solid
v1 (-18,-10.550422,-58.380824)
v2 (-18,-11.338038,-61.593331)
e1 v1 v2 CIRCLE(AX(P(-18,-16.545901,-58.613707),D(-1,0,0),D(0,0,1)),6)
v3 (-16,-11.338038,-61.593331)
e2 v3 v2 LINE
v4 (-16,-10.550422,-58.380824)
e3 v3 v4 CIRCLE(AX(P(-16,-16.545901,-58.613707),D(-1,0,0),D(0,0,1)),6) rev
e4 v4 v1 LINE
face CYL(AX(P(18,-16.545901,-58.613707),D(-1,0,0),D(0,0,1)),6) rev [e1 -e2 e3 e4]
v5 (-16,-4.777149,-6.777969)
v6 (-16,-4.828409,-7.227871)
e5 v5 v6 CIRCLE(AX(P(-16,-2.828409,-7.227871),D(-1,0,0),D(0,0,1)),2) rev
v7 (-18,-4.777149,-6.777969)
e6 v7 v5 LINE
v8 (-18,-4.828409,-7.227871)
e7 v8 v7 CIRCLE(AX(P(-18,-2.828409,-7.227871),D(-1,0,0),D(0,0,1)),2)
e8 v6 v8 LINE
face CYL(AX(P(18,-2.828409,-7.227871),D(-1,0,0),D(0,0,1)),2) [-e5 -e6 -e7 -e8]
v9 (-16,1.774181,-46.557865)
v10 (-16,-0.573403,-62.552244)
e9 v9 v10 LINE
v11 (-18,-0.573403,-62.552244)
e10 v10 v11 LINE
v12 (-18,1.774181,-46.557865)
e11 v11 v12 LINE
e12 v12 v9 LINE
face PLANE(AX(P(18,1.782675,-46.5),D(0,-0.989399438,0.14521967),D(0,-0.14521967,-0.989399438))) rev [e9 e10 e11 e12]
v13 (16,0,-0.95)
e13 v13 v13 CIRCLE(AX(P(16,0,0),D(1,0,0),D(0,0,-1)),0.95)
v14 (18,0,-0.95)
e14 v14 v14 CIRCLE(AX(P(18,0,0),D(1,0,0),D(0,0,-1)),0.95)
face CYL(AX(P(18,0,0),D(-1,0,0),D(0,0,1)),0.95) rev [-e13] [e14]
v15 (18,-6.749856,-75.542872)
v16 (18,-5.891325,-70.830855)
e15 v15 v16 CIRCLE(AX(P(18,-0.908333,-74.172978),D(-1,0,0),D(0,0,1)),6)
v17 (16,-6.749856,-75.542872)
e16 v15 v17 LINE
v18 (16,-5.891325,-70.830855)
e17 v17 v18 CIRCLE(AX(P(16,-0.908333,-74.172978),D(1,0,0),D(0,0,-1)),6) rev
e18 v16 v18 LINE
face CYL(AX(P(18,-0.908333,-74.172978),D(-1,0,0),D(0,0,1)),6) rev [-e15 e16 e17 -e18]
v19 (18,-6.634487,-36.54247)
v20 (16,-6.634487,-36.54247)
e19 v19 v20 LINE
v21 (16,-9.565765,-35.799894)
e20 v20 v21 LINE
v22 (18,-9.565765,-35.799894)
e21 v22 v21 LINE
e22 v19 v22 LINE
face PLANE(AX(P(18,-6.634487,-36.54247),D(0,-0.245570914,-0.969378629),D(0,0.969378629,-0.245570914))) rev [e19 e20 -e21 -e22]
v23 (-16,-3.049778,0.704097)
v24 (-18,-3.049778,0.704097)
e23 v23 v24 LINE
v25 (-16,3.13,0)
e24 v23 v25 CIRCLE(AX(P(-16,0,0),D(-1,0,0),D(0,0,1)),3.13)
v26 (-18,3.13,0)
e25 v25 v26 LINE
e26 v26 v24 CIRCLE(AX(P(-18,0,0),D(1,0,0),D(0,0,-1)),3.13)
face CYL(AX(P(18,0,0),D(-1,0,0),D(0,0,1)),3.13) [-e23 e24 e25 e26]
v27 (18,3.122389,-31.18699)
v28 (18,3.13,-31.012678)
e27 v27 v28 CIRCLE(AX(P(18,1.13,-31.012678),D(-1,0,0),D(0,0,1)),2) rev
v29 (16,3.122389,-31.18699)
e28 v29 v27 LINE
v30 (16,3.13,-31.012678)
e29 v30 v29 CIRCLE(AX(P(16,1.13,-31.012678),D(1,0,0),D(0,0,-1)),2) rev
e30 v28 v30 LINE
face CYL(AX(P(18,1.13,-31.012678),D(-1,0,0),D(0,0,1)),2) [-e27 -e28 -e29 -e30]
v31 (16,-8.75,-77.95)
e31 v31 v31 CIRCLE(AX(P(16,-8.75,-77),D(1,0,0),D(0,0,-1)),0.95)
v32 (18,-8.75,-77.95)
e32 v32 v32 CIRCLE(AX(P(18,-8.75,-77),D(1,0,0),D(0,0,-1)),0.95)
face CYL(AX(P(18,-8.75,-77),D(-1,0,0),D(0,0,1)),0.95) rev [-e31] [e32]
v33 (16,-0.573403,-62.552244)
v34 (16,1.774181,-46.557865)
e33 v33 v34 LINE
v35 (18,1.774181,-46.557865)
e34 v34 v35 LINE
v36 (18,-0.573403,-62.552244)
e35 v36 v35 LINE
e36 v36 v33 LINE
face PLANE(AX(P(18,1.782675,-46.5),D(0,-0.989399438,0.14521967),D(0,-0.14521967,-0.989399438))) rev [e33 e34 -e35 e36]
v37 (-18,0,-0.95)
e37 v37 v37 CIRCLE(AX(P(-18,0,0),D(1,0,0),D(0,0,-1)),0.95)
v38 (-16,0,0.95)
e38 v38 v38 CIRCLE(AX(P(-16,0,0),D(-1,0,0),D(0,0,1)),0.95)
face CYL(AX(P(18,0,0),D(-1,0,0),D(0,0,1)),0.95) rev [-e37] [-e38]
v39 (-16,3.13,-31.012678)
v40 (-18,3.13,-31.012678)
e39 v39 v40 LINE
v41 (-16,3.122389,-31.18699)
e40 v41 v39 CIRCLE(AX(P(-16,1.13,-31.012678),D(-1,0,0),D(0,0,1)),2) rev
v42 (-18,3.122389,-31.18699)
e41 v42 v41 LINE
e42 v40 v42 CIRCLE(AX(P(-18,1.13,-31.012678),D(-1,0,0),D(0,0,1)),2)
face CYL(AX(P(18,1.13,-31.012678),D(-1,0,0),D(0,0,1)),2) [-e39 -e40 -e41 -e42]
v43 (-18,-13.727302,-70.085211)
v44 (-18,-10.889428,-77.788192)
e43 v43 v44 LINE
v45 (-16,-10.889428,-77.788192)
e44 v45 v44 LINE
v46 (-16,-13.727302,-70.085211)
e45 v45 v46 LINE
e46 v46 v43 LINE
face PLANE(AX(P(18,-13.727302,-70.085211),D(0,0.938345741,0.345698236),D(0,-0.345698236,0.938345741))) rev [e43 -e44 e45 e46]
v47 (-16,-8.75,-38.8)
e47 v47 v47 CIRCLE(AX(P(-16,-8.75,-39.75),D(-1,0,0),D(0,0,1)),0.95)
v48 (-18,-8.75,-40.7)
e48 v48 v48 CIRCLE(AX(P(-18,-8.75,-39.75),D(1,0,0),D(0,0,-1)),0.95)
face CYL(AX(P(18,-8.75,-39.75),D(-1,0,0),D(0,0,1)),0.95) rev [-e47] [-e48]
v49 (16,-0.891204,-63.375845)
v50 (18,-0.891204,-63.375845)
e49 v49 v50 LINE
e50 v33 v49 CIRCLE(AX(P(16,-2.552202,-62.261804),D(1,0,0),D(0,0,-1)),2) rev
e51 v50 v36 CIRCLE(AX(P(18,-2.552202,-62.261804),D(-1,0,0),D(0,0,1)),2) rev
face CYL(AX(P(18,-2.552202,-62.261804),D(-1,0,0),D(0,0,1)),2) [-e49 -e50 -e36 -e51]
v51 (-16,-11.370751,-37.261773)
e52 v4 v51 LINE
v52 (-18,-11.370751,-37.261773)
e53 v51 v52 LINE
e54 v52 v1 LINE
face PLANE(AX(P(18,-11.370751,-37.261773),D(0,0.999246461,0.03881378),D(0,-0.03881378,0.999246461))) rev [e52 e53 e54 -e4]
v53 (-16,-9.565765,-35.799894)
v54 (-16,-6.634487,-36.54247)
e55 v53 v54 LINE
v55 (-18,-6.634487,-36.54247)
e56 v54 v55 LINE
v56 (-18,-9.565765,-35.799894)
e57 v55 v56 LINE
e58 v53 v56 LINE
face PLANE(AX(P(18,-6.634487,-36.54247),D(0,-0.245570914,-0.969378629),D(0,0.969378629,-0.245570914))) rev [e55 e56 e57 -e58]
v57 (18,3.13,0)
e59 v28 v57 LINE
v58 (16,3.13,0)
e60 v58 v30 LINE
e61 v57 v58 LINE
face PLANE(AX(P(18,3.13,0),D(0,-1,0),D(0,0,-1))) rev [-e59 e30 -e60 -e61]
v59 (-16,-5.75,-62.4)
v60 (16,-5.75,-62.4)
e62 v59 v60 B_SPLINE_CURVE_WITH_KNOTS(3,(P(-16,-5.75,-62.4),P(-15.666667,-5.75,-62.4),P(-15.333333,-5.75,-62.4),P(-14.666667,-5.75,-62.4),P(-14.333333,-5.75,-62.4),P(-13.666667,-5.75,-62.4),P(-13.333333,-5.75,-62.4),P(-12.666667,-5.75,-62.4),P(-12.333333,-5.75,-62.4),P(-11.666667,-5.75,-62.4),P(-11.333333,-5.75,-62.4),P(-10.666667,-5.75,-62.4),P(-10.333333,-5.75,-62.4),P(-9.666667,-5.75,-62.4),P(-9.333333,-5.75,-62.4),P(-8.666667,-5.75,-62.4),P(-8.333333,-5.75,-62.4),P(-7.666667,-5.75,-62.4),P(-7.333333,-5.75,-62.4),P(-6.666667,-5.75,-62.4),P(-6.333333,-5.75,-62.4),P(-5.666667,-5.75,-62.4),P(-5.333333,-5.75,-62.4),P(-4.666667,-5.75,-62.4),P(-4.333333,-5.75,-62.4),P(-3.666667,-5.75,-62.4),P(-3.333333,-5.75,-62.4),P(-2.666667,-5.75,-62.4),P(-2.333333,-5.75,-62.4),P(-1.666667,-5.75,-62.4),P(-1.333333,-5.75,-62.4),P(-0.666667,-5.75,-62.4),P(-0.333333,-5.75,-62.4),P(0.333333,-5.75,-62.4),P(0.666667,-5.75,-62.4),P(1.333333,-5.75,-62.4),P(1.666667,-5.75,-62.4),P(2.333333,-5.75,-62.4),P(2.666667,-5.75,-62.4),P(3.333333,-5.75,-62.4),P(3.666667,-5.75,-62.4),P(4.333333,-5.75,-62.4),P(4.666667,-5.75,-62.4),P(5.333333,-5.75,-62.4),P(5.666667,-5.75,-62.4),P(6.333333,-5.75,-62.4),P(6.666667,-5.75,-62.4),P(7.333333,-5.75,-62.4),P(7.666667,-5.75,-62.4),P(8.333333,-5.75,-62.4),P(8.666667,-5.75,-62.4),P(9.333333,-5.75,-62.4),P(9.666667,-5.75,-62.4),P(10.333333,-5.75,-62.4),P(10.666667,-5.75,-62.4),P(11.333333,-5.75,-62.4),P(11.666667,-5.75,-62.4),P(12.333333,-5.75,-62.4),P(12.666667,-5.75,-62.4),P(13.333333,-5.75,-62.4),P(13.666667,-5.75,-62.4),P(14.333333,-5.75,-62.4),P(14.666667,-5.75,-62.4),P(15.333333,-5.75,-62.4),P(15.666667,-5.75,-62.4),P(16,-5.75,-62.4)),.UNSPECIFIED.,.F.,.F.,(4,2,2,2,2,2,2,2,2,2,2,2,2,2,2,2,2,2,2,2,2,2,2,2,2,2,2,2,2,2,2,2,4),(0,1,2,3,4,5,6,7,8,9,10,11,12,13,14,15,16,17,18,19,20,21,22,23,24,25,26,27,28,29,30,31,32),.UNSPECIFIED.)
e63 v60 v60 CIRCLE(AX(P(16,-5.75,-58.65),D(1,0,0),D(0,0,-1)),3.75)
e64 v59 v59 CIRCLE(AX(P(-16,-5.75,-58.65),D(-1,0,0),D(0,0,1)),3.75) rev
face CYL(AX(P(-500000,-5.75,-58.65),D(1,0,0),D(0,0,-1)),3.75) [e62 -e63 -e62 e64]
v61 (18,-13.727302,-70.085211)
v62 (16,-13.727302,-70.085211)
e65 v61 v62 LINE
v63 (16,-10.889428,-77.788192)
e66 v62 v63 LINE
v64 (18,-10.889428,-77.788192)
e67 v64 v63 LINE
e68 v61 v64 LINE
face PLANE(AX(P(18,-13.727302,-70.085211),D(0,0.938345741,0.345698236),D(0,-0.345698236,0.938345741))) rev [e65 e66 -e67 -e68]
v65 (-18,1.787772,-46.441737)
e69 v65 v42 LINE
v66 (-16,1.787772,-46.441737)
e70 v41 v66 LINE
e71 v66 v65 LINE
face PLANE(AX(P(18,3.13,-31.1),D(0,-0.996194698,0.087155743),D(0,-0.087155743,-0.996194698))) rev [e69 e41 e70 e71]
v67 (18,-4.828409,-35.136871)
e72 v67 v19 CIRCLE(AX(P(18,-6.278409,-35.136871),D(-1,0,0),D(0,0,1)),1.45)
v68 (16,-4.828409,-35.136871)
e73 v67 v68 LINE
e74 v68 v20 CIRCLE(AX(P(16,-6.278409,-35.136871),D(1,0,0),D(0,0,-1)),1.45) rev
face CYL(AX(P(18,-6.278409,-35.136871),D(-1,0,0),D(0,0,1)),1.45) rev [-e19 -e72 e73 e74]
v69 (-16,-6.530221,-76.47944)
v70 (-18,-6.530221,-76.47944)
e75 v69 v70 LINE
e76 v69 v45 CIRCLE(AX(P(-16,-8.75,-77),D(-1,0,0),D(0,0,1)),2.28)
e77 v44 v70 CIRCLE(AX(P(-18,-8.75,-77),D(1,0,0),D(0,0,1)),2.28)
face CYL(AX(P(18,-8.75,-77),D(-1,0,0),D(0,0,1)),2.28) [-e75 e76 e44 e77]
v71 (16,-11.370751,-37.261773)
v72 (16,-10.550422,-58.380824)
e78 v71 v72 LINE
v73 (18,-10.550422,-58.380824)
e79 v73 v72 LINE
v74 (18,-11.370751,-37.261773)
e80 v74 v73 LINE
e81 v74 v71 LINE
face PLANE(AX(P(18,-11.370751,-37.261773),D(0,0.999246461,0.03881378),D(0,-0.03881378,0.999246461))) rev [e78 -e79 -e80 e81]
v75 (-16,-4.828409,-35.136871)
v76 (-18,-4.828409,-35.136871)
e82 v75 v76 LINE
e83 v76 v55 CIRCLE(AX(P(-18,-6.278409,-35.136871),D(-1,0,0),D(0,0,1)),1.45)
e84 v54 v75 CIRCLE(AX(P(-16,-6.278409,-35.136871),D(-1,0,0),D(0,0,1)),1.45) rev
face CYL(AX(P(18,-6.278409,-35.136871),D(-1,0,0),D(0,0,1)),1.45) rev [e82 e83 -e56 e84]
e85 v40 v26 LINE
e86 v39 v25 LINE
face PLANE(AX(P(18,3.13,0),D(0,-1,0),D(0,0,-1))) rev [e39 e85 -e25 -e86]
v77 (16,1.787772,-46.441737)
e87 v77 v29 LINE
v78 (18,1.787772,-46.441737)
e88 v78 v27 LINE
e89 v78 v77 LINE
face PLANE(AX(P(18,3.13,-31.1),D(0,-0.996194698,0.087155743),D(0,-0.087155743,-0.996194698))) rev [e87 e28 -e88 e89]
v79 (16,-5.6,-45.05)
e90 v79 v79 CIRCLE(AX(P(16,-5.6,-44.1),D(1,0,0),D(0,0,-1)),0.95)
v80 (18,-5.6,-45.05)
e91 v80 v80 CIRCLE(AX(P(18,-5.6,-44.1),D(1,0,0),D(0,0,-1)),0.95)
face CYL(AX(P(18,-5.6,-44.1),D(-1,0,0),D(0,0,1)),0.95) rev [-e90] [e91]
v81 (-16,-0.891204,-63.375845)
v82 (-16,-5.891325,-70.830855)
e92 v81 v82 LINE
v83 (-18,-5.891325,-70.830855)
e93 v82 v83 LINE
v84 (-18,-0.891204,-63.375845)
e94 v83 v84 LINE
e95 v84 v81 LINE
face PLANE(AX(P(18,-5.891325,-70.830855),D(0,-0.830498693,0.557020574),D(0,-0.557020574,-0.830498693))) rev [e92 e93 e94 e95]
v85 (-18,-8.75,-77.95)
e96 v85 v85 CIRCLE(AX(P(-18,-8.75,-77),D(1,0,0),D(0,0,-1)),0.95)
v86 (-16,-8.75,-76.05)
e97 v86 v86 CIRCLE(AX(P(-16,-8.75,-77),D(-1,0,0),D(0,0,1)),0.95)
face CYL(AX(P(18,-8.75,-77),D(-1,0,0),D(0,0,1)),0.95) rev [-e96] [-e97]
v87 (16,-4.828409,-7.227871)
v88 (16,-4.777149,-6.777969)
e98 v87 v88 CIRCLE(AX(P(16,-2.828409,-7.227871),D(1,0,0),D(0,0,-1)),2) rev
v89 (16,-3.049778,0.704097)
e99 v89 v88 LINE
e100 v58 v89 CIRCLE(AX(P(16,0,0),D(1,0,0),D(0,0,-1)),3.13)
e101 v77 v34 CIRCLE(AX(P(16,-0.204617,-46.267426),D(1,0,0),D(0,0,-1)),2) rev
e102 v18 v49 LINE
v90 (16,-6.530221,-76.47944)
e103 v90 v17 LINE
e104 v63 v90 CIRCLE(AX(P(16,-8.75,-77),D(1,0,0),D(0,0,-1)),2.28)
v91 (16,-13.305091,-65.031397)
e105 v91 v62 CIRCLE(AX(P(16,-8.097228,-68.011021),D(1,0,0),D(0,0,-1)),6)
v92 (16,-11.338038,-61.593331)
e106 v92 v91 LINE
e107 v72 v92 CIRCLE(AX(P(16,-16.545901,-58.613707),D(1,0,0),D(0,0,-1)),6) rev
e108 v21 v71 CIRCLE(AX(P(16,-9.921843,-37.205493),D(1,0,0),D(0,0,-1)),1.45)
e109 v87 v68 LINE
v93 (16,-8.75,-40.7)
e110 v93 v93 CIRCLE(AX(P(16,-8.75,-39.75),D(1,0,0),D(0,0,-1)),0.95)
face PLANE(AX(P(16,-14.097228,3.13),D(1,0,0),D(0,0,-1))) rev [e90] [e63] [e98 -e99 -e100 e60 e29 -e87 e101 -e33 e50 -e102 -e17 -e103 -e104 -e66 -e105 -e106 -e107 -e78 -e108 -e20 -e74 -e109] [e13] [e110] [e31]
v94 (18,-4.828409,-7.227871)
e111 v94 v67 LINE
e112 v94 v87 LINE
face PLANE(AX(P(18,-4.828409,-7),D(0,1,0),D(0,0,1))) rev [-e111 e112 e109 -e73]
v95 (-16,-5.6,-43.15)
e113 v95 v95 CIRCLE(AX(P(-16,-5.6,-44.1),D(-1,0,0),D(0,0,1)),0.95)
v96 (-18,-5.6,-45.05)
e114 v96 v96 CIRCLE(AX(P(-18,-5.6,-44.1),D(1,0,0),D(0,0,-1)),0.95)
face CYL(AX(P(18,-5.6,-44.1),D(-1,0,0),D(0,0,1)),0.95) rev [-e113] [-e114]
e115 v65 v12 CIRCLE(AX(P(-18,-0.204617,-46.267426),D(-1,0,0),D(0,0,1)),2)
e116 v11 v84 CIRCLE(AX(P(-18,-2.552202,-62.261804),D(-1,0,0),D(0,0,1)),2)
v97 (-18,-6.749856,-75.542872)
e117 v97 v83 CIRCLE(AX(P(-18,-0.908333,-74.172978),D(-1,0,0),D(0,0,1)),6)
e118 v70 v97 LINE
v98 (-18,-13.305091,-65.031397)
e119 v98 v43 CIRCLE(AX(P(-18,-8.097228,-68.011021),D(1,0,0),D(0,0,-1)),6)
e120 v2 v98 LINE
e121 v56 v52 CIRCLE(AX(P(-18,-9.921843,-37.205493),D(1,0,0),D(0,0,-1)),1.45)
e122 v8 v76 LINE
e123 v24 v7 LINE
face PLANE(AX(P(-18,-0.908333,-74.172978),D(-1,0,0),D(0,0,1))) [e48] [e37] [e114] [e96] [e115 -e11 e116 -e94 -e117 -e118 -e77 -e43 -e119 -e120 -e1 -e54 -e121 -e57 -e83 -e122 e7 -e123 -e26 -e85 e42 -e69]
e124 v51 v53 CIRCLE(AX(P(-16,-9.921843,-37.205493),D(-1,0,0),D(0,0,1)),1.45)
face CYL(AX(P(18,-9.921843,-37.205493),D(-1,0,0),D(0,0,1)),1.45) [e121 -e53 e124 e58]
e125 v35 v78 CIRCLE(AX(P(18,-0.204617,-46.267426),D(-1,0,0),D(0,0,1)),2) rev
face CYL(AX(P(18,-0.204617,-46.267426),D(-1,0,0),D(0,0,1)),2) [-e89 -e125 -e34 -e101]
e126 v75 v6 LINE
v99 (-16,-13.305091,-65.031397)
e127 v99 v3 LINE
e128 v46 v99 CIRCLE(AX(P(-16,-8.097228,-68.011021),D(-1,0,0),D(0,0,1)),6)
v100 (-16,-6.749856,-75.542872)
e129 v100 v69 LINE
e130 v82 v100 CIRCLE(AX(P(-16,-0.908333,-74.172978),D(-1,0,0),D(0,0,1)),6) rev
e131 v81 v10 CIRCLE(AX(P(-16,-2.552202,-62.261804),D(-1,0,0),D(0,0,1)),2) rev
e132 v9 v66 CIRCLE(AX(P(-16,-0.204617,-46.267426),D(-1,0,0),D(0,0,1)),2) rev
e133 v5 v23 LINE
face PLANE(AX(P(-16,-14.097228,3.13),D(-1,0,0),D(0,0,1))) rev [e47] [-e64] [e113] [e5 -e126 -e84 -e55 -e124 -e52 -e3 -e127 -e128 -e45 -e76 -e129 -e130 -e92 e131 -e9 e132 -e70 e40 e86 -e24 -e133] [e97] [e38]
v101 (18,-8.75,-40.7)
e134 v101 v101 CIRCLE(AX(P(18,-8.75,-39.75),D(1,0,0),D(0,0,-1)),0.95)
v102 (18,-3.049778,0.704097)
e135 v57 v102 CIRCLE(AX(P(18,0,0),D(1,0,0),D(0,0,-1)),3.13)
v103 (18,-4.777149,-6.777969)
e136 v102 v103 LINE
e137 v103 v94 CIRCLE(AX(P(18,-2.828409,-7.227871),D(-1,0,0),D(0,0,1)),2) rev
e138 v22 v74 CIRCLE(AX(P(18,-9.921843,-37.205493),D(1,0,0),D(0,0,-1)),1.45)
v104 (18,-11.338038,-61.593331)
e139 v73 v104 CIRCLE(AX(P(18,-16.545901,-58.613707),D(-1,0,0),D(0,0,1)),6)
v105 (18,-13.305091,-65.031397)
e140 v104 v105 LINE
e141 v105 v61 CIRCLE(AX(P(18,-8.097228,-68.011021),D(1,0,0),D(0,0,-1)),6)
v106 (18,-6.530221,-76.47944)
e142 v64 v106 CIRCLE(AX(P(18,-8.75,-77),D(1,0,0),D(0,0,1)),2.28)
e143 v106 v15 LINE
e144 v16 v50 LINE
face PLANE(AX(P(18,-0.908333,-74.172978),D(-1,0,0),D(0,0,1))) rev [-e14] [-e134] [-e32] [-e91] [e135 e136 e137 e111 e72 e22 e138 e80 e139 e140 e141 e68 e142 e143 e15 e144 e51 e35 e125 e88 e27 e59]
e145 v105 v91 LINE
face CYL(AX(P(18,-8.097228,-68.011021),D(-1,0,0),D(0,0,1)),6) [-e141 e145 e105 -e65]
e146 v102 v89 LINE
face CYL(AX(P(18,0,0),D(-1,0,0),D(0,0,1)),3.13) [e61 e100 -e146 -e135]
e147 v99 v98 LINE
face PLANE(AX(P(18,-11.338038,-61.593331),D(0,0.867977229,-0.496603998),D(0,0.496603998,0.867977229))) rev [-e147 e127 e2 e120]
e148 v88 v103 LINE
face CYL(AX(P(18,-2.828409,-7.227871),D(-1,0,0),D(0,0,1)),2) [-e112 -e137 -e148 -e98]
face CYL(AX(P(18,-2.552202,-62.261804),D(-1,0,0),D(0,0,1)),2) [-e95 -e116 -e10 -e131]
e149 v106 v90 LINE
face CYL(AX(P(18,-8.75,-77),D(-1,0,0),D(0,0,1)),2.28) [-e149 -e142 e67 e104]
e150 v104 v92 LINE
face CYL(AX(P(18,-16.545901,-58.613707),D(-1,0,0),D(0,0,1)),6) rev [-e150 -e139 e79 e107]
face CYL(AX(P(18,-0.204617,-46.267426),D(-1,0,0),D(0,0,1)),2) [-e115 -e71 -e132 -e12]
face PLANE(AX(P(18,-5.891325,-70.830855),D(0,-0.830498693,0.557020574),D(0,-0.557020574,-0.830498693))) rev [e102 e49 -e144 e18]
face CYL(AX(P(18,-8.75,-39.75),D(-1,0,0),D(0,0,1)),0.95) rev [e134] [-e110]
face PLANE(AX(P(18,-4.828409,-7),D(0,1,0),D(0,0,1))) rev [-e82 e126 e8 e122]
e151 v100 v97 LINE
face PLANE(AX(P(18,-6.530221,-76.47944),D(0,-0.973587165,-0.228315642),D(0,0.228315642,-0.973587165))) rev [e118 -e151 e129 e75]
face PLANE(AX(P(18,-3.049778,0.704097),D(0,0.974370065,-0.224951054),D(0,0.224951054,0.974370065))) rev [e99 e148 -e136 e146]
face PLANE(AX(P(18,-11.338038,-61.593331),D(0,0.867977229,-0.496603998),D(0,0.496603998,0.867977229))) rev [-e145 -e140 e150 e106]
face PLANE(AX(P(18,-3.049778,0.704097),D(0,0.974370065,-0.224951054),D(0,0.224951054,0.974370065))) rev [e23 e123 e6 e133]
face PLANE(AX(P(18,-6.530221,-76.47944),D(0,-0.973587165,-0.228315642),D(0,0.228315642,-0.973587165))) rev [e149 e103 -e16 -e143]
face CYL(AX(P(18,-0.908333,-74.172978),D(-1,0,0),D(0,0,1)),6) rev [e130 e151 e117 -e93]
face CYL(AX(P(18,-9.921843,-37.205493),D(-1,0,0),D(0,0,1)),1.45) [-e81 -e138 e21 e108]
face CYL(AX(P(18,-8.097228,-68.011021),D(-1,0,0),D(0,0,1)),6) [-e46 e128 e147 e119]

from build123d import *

# Parameters (mm, degrees)
SKETCH1_R                = 0.95
BOSS_EXTRUDE1_DEPTH      = 18
FILLET1_R                = 2
CUT_EXTRUDE1_DEPTH       = 83.510909783
CUT_EXTRUDE1_DEPTH_BACK  = 83.510909783
SKETCH2_W                = 32
SKETCH2_H                = 82.41
BOSS_EXTRUDE2_DEPTH      = 18
BOSS_EXTRUDE2_DEPTH_BACK = 16
SKETCH3_R                = 3.75


with BuildPart() as part:
    # Sketch1 → Boss-Extrude1 (new, symmetric)
    with BuildSketch(Plane(origin=(0, 0, 0), x_dir=(0, 0, -1), z_dir=(1, 0, 0))):
        with BuildLine():
            Line((0, 3.13), (31.1, 3.13))
            Line((31.1, 3.13), (46.5, 1.782674582))
            Line((46.5, 1.782674582), (63, -0.639122384))
            Line((63, -0.639122384), (70.830854785, -5.891324783))
            ThreePointArc((70.830854785, -5.891324783), (73.097482442, -6.811154728), (75.542872081, -6.749855612))
            Line((75.542872081, -6.749855612), (76.479440337, -6.530221264))
            ThreePointArc((76.479440337, -6.530221264), (79.183707452, -8.094392066), (77.788191978, -10.889428289))
            Line((77.788191978, -10.889428289), (70.085210842, -13.7273023))
            ThreePointArc((70.085210842, -13.7273023), (67.51150317, -14.076398492), (65.031397439, -13.305091226))
            Line((65.031397439, -13.305091226), (61.593330792, -11.338037731))
            ThreePointArc((61.593330792, -11.338037731), (60.042423522, -10.718485849), (58.380824128, -10.550422334))
            Line((58.380824128, -10.550422334), (37.261773194, -11.370750671))
            ThreePointArc((37.261773194, -11.370750671), (36.078702039, -10.834444885), (35.799894202, -9.565765476))
            Line((35.799894202, -9.565765476), (36.542469609, -6.634487021))
            ThreePointArc((36.542469609, -6.634487021), (36.281163577, -5.387851181), (35.136870597, -4.828409195))
            Line((35.136870597, -4.828409195), (7, -4.828409195))
            Line((7, -4.828409195), (-0.7040968, -3.049778303))
            ThreePointArc((-0.7040968, -3.049778303), (-3.109879908, 0.354326059), (0, 3.13))
        make_face()
        Circle(SKETCH1_R, mode=Mode.SUBTRACT)
        with Locations((44.1, -5.6)):
            Circle(SKETCH1_R, mode=Mode.SUBTRACT)
        with Locations((39.75, -8.75)):
            Circle(SKETCH1_R, mode=Mode.SUBTRACT)
        with Locations((77, -8.75)):
            Circle(SKETCH1_R, mode=Mode.SUBTRACT)
    extrude(amount=BOSS_EXTRUDE1_DEPTH, both=True)

    # Fillet1
    # the kernel refuses this fillet: 2 mm, written as the material it takes off along each edge
    with BuildSketch(Plane(origin=(19.131384491, -0.639122384, -63), x_dir=(0, -0.557020574337694, -0.8304986934152909), z_dir=(-1, 0, 0))) as fillet1_piece_1:
        with BuildLine():
            CenterArc((FILLET1_R * 0.226276898255, FILLET1_R), FILLET1_R, 244.5, 25.5)
            Line((-FILLET1_R * 0.204234198553, FILLET1_R * 0.0974147156501), (0, 0))
            Line((0, 0), (FILLET1_R * 0.226276898255, 0))
        make_face()
    extrude(amount=38.262768983, mode=Mode.SUBTRACT)
    with BuildSketch(Plane(origin=(-18.569678042, -4.828409195, -7), x_dir=(0, 0.22495105434386356, 0.9743700647852356), z_dir=(1, 0, 0))) as fillet1_piece_2:
        with BuildLine():
            CenterArc((FILLET1_R * 0.113935608302, -FILLET1_R), FILLET1_R, 90, 13)
            Line((-FILLET1_R * 0.111015446042, -FILLET1_R * 0.0256299352148), (0, 0))
            Line((0, 0), (FILLET1_R * 0.113935608302, 0))
        make_face()
    extrude(amount=37.139356083, mode=Mode.SUBTRACT)
    with BuildSketch(Plane(origin=(18.218304715, 3.13, -31.1), x_dir=(0, 0, 1), z_dir=(-1, 0, 0))) as fillet1_piece_3:
        with BuildLine():
            CenterArc((FILLET1_R * 0.0436609429085, -FILLET1_R), FILLET1_R, 90, 5)
            Line((-FILLET1_R * 0.0434947998391, -FILLET1_R * 0.00380530190825), (0, 0))
            Line((0, 0), (FILLET1_R * 0.0436609429085, 0))
        make_face()
    extrude(amount=36.436609429, mode=Mode.SUBTRACT)
    with BuildSketch(Plane(origin=(18.14621298, 1.782674582, -46.5), x_dir=(0, -0.14521967007723557, -0.9893994377513355), z_dir=(-1, 0, 0))) as fillet1_piece_4:
        with BuildLine():
            CenterArc((FILLET1_R * 0.0292425960983, FILLET1_R), FILLET1_R, 266.65, 3.35)
            Line((-FILLET1_R * 0.02919262642, FILLET1_R * 0.00170879761001), (0, 0))
            Line((0, 0), (FILLET1_R * 0.0292425960983, 0))
        make_face()
    extrude(amount=36.292425961, mode=Mode.SUBTRACT)

    # Sketch2 → Cut-Extrude1 (cut, two sides: drawn at the far end of the back side and taken through both)
    with BuildSketch(Plane(origin=(0, 0, 0), x_dir=(1, 0, 0), z_dir=(0, 1, 0)).offset(-CUT_EXTRUDE1_DEPTH_BACK)):
        with Locations((0, 38.075)):
            Rectangle(SKETCH2_W, SKETCH2_H)
    extrude(amount=CUT_EXTRUDE1_DEPTH + CUT_EXTRUDE1_DEPTH_BACK, mode=Mode.SUBTRACT)


with BuildPart() as cut_extrude1_piece_1:
    # of the separate pieces the step leaves, piece 1, a body of its own (cut_extrude1_pieces)
    add(part.part.solids().sort_by_distance((16, 3.13, 0))[0])



with BuildPart() as cut_extrude1_piece_2:
    # of the separate pieces the step leaves, piece 2, a body of its own (cut_extrude1_pieces)
    add(part.part.solids().sort_by_distance((-18, 3.13, 0))[0])


with BuildPart() as cut_extrude1_piece_1_1:
    add(cut_extrude1_piece_1.part)

    add(cut_extrude1_piece_2.part)  # Boss-Extrude2 merges Cut-Extrude1 piece 2
    # Sketch3 → Boss-Extrude2 (add, two sides: drawn at the far end of the back side and taken through both)
    with BuildSketch(Plane(origin=(0, 0, 0), x_dir=(0, 0, -1), z_dir=(1, 0, 0)).offset(-BOSS_EXTRUDE2_DEPTH_BACK)):
        with Locations((58.65, -5.75)):
            Circle(SKETCH3_R)
    extrude(amount=BOSS_EXTRUDE2_DEPTH + BOSS_EXTRUDE2_DEPTH_BACK)


solid = cut_extrude1_piece_1_1.part
